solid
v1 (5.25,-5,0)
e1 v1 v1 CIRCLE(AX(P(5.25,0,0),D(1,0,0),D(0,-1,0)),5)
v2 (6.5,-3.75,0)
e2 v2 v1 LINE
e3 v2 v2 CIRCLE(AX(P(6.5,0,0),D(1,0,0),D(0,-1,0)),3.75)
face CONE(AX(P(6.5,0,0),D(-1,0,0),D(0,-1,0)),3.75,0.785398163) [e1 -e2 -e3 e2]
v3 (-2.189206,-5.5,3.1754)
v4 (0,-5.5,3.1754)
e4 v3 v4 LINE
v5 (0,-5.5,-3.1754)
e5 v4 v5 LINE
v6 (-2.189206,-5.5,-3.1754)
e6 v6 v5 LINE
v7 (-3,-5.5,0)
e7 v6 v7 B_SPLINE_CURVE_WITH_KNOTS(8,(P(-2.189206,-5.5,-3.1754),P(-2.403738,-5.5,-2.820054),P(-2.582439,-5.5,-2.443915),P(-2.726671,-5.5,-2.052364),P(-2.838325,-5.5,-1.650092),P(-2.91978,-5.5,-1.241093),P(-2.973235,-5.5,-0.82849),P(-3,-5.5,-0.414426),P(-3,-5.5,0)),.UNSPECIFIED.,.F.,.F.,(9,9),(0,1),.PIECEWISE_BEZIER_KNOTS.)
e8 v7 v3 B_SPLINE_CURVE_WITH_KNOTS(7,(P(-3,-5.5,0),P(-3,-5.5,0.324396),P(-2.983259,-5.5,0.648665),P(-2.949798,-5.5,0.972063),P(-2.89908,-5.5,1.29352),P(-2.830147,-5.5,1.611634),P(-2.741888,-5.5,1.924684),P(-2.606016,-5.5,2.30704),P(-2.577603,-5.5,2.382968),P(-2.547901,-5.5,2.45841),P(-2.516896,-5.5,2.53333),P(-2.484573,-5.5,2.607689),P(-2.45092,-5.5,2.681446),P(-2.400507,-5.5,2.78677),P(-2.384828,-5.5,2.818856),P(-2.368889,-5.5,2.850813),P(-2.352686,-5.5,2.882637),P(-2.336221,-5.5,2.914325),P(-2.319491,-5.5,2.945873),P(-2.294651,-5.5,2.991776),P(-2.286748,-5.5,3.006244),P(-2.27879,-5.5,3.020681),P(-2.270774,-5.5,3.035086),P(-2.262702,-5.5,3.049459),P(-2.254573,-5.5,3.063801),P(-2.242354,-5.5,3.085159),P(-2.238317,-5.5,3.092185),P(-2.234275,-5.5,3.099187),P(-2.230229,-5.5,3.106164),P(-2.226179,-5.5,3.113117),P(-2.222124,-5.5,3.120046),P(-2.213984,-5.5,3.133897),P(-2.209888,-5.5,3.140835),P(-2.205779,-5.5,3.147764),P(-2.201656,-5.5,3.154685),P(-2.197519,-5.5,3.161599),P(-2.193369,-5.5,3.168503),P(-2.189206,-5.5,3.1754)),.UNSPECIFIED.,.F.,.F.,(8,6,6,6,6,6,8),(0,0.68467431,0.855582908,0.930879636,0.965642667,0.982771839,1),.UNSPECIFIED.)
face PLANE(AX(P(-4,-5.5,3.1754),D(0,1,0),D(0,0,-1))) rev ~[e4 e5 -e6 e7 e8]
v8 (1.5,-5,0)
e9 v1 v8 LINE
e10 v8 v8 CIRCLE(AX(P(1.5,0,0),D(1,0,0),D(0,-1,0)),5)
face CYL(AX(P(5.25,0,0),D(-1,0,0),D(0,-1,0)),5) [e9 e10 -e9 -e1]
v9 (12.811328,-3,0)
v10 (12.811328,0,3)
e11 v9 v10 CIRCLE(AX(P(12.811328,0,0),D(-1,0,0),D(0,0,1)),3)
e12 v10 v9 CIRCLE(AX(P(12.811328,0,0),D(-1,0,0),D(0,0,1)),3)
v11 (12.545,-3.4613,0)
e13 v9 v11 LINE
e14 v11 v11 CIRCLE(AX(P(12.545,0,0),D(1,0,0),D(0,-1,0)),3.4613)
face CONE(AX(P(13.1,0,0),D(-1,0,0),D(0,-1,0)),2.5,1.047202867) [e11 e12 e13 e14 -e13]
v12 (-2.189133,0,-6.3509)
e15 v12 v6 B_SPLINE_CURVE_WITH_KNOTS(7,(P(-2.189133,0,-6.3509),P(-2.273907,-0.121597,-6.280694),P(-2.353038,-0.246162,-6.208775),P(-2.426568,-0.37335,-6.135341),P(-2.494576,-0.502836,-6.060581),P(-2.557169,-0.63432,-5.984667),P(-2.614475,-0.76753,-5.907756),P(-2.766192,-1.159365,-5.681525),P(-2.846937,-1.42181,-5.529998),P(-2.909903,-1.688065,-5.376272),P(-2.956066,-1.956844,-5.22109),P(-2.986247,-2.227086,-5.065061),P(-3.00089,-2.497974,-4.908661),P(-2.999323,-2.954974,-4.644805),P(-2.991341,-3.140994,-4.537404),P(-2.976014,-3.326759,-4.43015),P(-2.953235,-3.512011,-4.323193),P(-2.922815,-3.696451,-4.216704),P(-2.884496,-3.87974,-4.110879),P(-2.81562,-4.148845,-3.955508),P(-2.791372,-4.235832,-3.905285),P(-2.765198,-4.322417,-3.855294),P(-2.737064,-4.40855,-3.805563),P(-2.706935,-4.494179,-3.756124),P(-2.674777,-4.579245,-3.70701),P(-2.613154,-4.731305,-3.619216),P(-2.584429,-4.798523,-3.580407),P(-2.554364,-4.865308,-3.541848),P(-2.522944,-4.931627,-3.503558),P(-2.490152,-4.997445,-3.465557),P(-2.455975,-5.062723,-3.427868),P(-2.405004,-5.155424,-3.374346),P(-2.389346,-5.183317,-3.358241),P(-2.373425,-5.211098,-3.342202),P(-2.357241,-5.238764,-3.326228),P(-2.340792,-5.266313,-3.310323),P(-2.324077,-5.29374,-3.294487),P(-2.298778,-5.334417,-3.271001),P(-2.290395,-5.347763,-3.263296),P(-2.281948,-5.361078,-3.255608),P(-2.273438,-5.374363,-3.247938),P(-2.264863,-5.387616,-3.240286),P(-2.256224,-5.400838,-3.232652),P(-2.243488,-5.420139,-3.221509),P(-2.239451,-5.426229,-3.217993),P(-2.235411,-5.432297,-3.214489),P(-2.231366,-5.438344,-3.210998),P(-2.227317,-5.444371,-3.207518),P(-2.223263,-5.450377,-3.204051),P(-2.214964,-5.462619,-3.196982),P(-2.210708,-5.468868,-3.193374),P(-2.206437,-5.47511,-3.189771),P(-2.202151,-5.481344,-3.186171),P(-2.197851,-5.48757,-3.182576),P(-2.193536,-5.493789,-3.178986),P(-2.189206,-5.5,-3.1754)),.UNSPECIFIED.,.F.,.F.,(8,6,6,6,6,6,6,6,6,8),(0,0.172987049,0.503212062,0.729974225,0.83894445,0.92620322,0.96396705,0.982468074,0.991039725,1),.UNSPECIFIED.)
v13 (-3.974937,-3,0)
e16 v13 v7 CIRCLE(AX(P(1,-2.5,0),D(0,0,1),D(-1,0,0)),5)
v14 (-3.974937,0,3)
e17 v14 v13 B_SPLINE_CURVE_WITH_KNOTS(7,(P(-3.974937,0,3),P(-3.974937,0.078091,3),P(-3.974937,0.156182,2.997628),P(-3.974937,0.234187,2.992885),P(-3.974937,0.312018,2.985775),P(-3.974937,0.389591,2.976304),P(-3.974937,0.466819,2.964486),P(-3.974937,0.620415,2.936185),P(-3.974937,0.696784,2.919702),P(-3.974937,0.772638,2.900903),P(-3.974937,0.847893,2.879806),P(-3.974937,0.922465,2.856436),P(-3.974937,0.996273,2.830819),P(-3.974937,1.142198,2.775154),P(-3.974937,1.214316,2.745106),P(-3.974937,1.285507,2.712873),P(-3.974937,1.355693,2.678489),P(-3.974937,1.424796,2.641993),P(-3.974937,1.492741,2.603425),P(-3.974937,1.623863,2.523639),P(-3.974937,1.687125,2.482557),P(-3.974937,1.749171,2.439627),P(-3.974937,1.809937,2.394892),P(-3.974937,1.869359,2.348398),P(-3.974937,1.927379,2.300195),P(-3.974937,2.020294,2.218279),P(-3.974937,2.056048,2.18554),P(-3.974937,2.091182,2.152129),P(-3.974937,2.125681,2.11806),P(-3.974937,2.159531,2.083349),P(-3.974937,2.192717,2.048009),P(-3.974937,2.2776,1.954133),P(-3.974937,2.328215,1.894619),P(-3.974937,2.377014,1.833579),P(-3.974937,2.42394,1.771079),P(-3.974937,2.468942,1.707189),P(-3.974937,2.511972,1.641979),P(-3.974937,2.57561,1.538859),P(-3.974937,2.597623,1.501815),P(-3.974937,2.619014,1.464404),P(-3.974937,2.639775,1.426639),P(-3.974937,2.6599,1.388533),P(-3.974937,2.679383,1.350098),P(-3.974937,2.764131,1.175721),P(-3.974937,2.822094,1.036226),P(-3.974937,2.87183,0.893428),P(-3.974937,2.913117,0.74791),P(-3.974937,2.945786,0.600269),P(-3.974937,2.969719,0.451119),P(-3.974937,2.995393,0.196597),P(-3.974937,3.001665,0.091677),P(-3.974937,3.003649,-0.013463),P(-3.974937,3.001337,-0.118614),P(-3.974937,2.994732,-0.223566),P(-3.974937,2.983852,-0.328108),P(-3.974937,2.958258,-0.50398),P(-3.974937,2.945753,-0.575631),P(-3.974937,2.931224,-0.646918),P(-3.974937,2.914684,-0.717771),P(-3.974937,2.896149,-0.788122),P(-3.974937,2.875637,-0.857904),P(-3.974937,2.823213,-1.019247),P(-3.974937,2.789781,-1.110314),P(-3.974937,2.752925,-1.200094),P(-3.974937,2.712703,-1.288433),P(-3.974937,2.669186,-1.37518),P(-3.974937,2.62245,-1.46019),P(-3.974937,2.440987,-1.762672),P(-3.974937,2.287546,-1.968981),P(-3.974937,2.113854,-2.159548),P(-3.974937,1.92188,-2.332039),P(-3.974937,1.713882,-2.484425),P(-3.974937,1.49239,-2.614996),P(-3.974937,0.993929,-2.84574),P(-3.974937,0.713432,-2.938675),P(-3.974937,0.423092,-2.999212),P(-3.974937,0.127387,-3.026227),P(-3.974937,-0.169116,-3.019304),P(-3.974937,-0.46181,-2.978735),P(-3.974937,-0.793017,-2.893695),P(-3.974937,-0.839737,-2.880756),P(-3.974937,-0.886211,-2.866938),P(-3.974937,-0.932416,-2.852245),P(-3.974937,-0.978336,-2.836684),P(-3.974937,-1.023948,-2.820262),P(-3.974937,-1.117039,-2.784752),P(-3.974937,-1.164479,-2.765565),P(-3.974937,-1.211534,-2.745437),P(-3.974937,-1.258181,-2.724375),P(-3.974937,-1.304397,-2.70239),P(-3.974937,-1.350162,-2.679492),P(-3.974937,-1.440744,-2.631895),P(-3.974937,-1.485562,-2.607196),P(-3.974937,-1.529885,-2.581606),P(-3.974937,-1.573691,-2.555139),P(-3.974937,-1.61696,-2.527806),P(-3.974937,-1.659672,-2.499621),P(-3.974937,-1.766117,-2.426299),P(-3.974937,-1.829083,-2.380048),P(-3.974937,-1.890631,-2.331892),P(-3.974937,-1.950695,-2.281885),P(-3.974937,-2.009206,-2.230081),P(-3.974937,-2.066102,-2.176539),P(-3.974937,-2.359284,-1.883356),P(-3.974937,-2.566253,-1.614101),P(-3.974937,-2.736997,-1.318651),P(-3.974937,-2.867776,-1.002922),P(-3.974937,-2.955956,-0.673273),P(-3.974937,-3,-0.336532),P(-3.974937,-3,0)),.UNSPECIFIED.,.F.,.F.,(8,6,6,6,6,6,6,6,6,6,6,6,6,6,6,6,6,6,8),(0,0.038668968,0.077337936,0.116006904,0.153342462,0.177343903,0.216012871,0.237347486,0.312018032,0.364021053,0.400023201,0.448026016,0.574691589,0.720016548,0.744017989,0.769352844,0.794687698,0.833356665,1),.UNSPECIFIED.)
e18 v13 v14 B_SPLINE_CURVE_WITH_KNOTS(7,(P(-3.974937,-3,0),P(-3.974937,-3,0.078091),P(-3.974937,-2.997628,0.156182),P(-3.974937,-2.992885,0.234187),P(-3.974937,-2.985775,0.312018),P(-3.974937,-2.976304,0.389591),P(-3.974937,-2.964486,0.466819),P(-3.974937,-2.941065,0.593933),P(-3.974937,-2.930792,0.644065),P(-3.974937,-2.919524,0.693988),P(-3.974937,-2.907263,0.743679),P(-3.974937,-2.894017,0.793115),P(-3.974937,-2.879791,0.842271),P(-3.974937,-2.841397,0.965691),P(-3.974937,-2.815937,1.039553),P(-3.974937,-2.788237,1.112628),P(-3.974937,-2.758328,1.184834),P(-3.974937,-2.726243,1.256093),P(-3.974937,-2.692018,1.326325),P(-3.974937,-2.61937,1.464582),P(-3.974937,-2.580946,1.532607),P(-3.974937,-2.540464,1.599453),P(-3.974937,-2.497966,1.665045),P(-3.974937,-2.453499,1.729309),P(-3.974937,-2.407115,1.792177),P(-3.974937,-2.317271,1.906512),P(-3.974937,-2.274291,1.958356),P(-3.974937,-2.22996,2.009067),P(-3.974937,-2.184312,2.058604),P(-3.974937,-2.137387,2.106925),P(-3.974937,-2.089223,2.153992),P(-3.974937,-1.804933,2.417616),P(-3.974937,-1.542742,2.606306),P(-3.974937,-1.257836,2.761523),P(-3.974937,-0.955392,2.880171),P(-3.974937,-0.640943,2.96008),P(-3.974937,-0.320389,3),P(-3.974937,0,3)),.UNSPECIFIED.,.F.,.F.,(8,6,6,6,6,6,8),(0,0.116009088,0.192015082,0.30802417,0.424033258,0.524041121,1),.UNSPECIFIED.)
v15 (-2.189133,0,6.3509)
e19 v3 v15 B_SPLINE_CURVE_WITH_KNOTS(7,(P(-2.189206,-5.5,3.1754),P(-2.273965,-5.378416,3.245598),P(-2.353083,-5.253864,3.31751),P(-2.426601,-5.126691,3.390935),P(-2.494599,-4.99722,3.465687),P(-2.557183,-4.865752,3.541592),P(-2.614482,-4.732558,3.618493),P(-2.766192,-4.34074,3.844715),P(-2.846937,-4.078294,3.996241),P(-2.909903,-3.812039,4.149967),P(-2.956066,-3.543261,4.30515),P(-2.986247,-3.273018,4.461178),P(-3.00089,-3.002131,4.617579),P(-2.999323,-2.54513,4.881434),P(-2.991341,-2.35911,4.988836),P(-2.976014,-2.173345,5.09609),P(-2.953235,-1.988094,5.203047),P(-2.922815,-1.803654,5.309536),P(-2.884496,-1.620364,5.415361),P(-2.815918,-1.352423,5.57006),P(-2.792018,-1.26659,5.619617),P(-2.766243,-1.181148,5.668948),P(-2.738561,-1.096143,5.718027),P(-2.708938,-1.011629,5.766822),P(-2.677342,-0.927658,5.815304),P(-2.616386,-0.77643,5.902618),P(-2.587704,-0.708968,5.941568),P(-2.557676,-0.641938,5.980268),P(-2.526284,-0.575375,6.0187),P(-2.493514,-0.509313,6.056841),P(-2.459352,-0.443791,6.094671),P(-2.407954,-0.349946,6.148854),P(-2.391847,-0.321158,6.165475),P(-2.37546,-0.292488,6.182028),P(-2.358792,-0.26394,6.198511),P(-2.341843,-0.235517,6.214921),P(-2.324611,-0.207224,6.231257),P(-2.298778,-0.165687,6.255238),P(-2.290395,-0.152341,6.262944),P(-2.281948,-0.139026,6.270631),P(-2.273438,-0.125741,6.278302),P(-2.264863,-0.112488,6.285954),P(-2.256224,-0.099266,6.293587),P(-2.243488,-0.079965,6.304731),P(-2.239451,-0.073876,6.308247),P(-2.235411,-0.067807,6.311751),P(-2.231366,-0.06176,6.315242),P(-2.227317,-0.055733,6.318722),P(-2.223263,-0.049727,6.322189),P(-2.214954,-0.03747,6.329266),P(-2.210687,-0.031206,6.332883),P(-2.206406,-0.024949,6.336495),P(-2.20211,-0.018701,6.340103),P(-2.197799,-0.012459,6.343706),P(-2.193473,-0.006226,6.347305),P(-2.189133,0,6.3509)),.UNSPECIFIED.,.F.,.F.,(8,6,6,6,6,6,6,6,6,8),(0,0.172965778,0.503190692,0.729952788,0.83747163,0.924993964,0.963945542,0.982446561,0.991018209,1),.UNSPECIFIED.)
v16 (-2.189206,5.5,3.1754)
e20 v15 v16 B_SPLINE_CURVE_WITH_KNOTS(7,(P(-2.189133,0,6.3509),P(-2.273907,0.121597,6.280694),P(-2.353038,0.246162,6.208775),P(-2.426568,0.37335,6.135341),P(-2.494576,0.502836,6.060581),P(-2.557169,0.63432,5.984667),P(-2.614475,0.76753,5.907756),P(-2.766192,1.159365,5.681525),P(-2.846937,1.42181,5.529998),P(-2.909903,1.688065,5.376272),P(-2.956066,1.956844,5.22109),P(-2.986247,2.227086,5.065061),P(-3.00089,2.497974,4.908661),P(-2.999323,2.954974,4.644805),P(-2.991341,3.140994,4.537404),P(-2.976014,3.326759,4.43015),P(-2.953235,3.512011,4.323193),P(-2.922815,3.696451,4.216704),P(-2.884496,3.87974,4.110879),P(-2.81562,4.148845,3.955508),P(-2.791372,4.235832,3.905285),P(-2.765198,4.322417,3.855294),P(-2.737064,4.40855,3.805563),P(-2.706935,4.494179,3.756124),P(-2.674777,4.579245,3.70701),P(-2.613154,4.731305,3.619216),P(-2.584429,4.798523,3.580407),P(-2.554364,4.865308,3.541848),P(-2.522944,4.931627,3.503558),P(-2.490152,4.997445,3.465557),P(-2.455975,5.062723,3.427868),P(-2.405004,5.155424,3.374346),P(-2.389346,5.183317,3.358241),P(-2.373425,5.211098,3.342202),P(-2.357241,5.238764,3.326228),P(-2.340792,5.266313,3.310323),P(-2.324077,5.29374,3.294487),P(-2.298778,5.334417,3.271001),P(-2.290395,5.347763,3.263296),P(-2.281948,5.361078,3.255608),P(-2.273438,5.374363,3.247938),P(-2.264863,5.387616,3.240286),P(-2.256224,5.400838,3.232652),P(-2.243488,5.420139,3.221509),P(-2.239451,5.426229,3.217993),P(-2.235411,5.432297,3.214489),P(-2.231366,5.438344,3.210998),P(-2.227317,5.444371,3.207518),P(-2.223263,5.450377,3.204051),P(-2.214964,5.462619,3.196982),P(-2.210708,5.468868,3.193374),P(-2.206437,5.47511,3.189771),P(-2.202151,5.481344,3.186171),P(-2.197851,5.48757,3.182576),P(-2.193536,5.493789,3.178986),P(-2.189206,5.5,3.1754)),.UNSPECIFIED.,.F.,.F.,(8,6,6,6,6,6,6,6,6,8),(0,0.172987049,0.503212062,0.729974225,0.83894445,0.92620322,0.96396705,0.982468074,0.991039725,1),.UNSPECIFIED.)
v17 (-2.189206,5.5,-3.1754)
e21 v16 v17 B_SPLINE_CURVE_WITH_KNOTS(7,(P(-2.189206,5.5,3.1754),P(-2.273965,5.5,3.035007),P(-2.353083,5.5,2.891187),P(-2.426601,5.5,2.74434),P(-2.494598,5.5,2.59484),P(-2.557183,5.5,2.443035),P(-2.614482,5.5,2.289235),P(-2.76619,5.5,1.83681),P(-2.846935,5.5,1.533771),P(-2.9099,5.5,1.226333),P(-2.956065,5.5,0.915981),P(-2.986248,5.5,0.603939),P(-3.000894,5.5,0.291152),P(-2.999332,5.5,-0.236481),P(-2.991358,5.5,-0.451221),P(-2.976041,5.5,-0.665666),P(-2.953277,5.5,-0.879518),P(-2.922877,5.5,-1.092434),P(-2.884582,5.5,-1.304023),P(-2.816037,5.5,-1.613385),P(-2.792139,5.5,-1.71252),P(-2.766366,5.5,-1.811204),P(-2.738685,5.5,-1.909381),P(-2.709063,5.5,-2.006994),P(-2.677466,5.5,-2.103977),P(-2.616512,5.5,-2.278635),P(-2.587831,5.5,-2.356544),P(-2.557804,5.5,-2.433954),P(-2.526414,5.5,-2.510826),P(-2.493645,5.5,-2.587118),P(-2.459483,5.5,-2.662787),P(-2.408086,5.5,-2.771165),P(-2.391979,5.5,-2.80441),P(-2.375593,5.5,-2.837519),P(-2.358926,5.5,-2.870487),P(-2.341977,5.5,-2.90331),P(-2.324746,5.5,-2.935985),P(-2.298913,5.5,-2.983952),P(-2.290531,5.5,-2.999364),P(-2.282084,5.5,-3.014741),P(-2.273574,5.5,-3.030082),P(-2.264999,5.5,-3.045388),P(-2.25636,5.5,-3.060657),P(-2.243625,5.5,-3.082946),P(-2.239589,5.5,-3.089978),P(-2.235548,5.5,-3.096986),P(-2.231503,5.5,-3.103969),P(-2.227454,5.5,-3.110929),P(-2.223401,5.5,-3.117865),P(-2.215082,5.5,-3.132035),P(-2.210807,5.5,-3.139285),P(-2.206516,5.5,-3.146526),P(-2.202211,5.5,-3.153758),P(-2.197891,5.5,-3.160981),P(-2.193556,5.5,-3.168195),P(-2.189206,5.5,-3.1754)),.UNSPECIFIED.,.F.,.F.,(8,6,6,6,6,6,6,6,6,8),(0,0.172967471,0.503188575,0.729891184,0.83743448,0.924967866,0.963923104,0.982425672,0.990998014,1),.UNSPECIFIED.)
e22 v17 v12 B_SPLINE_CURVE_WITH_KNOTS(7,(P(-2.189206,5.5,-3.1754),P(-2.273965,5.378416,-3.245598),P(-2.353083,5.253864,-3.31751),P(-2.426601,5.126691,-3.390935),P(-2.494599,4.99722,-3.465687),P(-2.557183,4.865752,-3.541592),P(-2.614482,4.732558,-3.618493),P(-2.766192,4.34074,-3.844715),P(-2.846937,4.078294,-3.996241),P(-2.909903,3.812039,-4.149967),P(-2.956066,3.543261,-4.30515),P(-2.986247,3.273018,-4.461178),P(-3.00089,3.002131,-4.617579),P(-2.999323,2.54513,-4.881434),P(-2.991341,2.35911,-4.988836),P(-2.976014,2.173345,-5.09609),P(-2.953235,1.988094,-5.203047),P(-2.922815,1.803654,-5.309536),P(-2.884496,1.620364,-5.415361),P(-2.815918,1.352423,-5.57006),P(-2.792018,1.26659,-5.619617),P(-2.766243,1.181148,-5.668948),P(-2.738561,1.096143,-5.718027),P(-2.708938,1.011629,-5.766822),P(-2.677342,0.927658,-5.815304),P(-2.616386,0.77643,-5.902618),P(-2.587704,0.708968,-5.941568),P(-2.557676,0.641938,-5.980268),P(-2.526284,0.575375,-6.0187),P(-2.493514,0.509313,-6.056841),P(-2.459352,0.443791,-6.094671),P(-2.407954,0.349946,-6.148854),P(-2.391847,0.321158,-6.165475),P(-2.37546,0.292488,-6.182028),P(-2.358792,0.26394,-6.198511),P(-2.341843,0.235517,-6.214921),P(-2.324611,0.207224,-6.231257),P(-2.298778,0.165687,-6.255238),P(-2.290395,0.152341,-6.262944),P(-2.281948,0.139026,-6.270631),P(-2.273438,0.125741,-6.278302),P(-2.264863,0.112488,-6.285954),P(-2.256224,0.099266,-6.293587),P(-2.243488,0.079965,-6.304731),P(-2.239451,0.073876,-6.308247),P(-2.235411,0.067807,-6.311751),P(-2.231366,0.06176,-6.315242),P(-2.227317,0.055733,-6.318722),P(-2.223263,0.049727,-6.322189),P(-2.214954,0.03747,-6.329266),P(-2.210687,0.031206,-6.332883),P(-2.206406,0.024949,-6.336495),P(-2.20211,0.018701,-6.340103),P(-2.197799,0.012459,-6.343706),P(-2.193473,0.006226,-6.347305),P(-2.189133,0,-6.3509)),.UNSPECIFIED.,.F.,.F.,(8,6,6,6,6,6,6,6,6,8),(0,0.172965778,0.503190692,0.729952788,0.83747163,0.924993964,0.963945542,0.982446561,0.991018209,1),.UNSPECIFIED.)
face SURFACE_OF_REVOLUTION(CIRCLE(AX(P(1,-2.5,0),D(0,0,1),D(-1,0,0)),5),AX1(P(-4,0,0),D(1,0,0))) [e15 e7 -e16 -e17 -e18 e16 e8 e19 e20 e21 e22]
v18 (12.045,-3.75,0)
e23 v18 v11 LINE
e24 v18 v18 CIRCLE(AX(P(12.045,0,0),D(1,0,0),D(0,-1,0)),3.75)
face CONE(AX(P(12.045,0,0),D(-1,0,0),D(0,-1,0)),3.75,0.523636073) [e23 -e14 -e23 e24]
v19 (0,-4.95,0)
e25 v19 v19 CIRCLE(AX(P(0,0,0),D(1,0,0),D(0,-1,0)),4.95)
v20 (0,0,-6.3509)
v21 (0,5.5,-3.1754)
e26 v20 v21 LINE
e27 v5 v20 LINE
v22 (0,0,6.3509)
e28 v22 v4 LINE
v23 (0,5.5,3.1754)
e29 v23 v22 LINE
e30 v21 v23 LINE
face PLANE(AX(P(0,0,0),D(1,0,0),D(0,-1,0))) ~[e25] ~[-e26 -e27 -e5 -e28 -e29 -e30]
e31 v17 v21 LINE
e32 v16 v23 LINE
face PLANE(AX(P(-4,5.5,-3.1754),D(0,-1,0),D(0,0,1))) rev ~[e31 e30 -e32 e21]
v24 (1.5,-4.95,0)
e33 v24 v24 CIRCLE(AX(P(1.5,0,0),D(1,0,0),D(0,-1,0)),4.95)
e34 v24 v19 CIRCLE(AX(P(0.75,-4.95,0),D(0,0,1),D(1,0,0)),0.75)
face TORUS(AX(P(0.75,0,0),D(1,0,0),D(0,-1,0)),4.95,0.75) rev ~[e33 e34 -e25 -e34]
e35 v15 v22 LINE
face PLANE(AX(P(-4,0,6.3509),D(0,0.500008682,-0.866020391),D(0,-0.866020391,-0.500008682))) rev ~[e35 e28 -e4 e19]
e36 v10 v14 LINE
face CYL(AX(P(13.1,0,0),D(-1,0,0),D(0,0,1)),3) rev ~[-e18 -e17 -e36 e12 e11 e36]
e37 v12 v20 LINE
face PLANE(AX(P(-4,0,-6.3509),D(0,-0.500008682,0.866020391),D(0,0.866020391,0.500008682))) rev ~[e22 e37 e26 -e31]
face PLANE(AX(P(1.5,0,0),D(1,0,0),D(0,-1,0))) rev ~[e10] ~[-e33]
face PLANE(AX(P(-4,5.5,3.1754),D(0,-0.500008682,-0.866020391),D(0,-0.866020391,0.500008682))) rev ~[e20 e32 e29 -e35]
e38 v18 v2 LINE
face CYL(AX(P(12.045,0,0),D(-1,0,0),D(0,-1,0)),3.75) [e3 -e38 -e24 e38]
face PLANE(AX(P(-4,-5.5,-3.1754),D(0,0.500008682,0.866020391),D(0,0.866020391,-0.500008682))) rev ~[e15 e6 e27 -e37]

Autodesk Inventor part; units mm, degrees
ref_plane "YZ Plane" through (0, 0, 0) normal (1, 0, 0) x (0, 1, 0)
ref_plane "XZ Plane" through (0, 0, 0) normal (0, 1, 0) x (-1, 0, 0)
ref_plane "XY Plane" through (0, 0, 0) normal (0, 0, 1) x (1, 0, 0)
sketch "Náčrt1" plane through (0, 0, 0) normal (0, 0, 1) x (1, 0, 0)
  line L0 (0, 0) -> (0, 2.5)
  line L1 (0, 2.5) -> (0.555, 3.4613)
  line L2 (6.6, 3.75) -> (7.85, 5)
  line L3 (7.85, 5) -> (11.6, 5)
  line L4 (11.6, 5) -> (11.6, 4.95)
  arc A0 (11.6, 4.95) -> (13.1, 4.95) centre (12.35, 4.95) ccw
  line L5 (13.1, 4.95) -> (13.1, 6.5)
  line L6 (13.1, 6.5) -> (17.1, 6.5)
  line L7 (17.1, 6.5) -> (17.1, 0)
  line L8 (17.1, 0) -> (0, 0)
  line L9 (1.055, 3.75) -> (0.555, 3.4613)
  line L10 (1.055, 3.75) -> (6.6, 3.75)
  arc A1 (17.1, 2.5) -> (15.1, 6.5) centre (12.1, 2.5) ccw
  dimension "d2" = 30
  dimension "d3" = 45
  dimension "d5" = 6.6
  dimension "d6" = 10
  dimension "d7" = 5
  dimension "d8" = 1.5
  dimension "d9" = 13.1
  dimension "d10" = 17.1
  dimension "d11" = 13
  dimension "d12" = 8.4
  dimension "d32" = 30
  dimension "d34" = 0.5
  dimension "d35" = 7.5
  dimension "d46" = 5
  dimension "d47" = 5
revolve "Rotace1" add sketch "Náčrt1" angle 360 about axis through (17.1, 0, 0) along (-1, 0, 0) contours L0 L1 L9 L10 L2 L3 L4 A0 L5 L6 A1 L7 L8
sketch "Náčrt2" plane through (17.1, 0, 0) normal (1, 0, 0) x (0, 0, -1)
  line L0 (3.1754, 5.5) -> (6.3509, 0)
  line L1 (6.3509, 0) -> (3.1754, -5.5)
  line L2 (3.1754, -5.5) -> (-3.1754, -5.5)
  line L3 (-3.1754, -5.5) -> (-6.3509, 0)
  line L4 (-6.3509, 0) -> (-3.1754, 5.5)
  line L5 (-3.1754, 5.5) -> (3.1754, 5.5)
  circle A0 centre (0, 0) radius 7.7861
  dimension "d14" = 5.5
extrude "Vysunutí1" cut sketch "Náčrt2" against normal through all
sketch "Náčrt4" plane through (0, 0, 0) normal (-1, 0, 0) x (0, 0, 1)
  circle A0 centre (0, 0) radius 3.75 projected
  point P0 (0, 0)
hole "Díra1" at (0, 0, 0) direction (1, 0, 0) diameter 6 end through all
thread "Závit1" size "M10x1" class "6g" standard "ISO Metric profile" full length
move or copy body "Posunout těleso1" bodies to move or copy 1 copy no rotation origin (0, 0, 0) rotation axis (0, 0, 1) rotation angle 180 translate (13.1, 0, 0)
properties part number "Cap03" material "ČSN 12 050 (1.1201, C45)"
